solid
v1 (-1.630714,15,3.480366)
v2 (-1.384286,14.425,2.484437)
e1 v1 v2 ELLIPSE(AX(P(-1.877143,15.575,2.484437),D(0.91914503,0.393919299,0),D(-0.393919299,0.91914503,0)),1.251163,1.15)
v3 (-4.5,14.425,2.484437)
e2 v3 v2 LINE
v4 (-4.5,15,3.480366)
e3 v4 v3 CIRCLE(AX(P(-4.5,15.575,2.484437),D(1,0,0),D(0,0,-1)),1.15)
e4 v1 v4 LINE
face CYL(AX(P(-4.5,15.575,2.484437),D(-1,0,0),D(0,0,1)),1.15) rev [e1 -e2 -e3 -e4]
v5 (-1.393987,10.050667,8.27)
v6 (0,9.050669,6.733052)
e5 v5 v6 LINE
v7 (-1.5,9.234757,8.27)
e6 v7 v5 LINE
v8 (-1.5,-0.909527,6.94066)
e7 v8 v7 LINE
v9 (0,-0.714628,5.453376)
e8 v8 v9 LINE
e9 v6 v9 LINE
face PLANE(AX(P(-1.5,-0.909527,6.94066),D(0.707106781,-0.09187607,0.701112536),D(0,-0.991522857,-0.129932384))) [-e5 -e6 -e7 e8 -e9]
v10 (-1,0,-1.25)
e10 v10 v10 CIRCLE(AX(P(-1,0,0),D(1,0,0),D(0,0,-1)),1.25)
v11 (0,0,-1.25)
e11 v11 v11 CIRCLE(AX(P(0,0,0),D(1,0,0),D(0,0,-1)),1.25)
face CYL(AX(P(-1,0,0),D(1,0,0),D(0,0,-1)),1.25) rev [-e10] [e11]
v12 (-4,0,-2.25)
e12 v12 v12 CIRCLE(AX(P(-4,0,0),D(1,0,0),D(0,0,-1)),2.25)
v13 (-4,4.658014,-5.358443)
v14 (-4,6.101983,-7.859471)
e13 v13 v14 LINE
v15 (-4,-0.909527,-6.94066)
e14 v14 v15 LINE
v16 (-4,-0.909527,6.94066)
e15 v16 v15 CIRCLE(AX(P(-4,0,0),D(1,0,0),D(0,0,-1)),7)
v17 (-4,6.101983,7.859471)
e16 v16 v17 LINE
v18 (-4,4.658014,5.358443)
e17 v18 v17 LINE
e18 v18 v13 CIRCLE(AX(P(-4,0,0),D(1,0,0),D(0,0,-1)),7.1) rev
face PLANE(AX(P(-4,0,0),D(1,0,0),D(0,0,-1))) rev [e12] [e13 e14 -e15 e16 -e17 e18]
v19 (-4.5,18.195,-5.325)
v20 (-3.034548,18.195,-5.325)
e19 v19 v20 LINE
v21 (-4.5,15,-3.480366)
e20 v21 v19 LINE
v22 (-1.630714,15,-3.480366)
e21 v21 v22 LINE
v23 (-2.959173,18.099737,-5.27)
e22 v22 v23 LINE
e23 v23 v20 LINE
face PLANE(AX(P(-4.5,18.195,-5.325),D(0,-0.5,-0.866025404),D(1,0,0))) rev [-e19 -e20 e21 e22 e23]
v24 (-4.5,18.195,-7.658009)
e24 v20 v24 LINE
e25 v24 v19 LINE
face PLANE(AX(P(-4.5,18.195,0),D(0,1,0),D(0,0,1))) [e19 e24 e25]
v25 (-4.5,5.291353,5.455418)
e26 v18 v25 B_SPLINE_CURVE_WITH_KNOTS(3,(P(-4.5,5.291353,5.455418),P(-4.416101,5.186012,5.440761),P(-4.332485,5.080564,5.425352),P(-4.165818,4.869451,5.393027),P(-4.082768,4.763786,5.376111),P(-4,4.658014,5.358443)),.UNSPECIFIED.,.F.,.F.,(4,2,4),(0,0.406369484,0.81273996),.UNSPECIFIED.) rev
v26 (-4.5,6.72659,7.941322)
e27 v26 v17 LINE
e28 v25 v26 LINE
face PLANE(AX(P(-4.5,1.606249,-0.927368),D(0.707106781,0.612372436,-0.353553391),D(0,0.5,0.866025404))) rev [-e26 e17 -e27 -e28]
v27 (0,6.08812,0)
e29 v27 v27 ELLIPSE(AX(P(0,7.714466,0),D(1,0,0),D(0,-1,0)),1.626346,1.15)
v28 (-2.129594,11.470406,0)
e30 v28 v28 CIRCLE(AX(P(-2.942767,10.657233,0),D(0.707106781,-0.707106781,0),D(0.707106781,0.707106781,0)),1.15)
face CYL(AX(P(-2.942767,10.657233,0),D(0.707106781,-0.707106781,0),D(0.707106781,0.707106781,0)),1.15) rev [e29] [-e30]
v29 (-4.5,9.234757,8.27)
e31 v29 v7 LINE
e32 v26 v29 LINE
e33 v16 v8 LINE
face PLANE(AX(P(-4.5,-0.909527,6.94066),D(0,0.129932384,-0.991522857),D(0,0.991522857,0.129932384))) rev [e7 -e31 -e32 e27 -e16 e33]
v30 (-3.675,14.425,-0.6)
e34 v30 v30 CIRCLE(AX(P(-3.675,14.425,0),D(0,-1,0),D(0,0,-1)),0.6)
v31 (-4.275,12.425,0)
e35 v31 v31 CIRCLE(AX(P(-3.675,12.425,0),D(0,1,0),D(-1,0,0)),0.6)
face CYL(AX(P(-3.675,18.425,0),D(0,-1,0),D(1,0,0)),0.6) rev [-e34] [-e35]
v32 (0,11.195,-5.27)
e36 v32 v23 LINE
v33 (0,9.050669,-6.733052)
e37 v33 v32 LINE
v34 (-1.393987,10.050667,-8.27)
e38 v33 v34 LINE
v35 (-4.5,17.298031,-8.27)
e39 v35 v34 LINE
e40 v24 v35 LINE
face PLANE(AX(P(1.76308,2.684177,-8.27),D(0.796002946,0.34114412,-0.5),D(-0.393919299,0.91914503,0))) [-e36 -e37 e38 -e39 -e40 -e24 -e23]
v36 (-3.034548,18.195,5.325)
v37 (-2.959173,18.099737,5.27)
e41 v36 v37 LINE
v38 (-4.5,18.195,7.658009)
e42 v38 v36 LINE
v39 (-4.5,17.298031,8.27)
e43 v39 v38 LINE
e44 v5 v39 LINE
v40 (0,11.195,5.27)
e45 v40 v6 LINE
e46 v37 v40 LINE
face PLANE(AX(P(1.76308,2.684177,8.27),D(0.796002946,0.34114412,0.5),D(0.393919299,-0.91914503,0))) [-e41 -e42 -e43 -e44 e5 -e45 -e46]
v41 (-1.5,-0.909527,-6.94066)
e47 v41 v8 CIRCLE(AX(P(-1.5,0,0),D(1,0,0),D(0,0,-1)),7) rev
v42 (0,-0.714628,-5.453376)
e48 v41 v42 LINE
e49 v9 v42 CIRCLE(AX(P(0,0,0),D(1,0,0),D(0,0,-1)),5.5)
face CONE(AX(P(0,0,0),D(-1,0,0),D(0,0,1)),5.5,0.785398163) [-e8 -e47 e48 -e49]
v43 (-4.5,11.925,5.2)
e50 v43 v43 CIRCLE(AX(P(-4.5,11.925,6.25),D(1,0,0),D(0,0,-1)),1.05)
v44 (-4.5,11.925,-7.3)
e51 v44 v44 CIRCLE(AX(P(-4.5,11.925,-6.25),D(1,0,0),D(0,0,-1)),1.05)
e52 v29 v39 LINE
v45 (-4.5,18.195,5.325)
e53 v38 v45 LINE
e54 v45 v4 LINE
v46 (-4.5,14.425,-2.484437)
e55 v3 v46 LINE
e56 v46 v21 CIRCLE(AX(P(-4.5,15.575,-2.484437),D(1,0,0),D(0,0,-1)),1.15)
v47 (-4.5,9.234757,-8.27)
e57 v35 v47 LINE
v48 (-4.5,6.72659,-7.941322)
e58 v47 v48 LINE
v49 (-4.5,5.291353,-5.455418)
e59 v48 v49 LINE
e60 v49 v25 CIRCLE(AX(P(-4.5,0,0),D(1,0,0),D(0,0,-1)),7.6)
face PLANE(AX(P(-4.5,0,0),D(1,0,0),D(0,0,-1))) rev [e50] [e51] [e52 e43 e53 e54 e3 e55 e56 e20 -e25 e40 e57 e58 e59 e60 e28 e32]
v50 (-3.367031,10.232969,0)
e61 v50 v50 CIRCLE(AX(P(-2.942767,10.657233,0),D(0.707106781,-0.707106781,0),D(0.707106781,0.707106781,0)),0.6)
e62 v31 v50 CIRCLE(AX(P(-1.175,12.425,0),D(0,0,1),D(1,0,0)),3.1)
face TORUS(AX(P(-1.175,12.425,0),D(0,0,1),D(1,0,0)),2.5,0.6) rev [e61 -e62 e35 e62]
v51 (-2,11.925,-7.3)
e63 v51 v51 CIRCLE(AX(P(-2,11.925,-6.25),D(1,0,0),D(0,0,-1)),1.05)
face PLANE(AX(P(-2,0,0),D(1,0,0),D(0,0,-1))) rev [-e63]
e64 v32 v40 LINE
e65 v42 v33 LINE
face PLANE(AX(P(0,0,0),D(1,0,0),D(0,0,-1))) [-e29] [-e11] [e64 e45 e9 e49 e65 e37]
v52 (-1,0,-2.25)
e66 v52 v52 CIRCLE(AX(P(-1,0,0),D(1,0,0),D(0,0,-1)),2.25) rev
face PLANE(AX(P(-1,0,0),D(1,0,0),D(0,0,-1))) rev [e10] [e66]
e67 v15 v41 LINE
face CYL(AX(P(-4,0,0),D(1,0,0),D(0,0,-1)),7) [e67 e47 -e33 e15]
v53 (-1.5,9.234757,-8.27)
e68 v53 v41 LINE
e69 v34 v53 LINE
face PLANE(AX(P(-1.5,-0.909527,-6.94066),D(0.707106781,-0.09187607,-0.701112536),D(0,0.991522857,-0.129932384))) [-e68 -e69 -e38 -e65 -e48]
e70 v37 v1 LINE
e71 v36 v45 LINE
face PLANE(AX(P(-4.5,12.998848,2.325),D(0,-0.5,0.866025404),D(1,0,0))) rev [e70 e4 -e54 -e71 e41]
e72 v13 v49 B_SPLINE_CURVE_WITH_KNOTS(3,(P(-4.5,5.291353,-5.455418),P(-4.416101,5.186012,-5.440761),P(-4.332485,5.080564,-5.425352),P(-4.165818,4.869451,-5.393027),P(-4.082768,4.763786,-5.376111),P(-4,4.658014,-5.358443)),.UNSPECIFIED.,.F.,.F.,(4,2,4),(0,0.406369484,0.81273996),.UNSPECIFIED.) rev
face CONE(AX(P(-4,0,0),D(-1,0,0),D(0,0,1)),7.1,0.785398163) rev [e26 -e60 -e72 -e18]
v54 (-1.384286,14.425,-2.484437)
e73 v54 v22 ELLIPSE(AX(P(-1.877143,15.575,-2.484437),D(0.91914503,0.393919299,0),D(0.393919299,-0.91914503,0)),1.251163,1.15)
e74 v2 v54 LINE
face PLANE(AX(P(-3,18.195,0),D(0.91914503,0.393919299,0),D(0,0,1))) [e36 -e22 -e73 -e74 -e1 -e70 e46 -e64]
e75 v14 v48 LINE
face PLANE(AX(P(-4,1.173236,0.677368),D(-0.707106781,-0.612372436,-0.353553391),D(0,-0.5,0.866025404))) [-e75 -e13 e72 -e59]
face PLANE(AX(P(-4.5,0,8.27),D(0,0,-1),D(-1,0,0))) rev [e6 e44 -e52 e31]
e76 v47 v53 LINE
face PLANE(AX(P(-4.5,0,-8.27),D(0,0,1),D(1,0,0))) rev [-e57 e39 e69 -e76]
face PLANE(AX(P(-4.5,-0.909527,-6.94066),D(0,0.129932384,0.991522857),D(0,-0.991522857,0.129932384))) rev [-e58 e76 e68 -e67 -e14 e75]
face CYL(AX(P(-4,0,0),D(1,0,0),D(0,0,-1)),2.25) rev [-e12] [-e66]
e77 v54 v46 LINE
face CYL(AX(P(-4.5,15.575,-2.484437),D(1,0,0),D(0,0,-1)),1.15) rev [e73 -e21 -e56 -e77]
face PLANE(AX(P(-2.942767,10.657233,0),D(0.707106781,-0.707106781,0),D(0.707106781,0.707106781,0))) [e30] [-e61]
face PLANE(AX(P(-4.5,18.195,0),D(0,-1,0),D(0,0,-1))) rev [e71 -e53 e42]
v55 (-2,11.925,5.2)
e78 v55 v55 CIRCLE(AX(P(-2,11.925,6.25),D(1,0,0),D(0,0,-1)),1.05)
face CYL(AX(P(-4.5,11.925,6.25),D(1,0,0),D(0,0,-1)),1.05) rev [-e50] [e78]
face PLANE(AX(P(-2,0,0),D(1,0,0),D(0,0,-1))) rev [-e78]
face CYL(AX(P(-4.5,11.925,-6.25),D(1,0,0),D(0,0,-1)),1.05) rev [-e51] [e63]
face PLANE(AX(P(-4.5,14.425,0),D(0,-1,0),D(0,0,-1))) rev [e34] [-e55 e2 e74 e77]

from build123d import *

# Parameters (mm, degrees)
BOSS_EXTRUDE4_DEPTH  = 4.5
SKETCH1_R            = 2.25
BOSS_EXTRUDE1_DEPTH  = 4
SKETCH1_4_R          = 2.25
SKETCH1_4_R_2        = 1.25
BOSS_EXTRUDE2_DEPTH  = 1
CHAMFER1_SIZE        = 3
CHAMFER1_SIZE_2      = 5.196152423
FILLET1_R            = 1.15
CHAMFER2_SIZE        = 7
CHAMFER2_SIZE2       = 3
CHAMFER3_SIZE        = 3
CHAMFER3_SIZE2       = 1.732050808
CHAMFER4_SIZE        = 1.5
CUT_EXTRUDE1_START   = -2
SKETCH1_6_R          = 1.05
CUT_EXTRUDE1_DEPTH   = 19.48660355
CUT_SWEEP1_PROFILE_R = 0.6
CUT_SWEEP2_PROFILE_R = 1.15
CHAMFER5_SIZE        = 0.5


# Some blends are built 0.0001 mm under size
with BuildPart() as part:
    # Sketch1<7> → Boss-Extrude4 (new body)
    with BuildSketch(Plane(origin=(0, 0, 0), x_dir=(0, 0, -1), z_dir=(1, 0, 0))):
        with BuildLine():
            Line((8.27, 9.234757272), (8.27, 18.195))
            Line((8.27, 18.195), (2.325, 18.195))
            Line((2.325, 18.195), (2.325, 14.425))
            Line((2.325, 14.425), (-2.325, 14.425))
            Line((-2.325, 14.425), (-2.325, 18.195))
            Line((-2.325, 18.195), (-8.27, 18.195))
            Line((-8.27, 18.195), (-8.27, 9.234757272))
            Line((-8.27, 9.234757272), (-7.859471067, 6.101983066))
            Line((-7.859471067, 6.101983066), (-5.358442733, 4.658013684))
            ThreePointArc((-5.358442733, 4.658013684), (0, 7.1), (5.358442733, 4.658013684))
            Line((5.358442733, 4.658013684), (7.859471067, 6.101983066))
            Line((7.859471067, 6.101983066), (8.27, 9.234757272))
        make_face()
    extrude(amount=-BOSS_EXTRUDE4_DEPTH)

    # Sketch1 → Boss-Extrude1 (add)
    with BuildSketch(Plane(origin=(0, 0, 0), x_dir=(0, 0, -1), z_dir=(1, 0, 0))):
        with BuildLine():
            Line((6.940659998, -0.909526687), (7.859471067, 6.101983066))
            Line((7.859471067, 6.101983066), (5.358442733, 4.658013684))
            ThreePointArc((5.358442733, 4.658013684), (0, 7.1), (-5.358442733, 4.658013684))
            Line((-5.358442733, 4.658013684), (-7.859471067, 6.101983066))
            Line((-7.859471067, 6.101983066), (-6.940659998, -0.909526687))
            ThreePointArc((-6.940659998, -0.909526687), (0, -7), (6.940659998, -0.909526687))
        make_face()
        Circle(SKETCH1_R, mode=Mode.SUBTRACT)
    extrude(amount=-BOSS_EXTRUDE1_DEPTH)

    # Sketch1<4> → Boss-Extrude2 (add)
    with BuildSketch(Plane(origin=(0, 0, 0), x_dir=(0, 0, -1), z_dir=(1, 0, 0))):
        Circle(SKETCH1_4_R)
        Circle(SKETCH1_4_R_2, mode=Mode.SUBTRACT)
    extrude(amount=-BOSS_EXTRUDE2_DEPTH)

    # Chamfer1
    # the kernel refuses this chamfer: 5.196152423, 3 mm, written as the material it takes off along each edge
    with BuildSketch(Plane(origin=(13.442891912, 18.195, -2.325), x_dir=(0, 0.057893862402672046, -0.9983227437537926), z_dir=(-1, 0, 0))) as chamfer1_piece_1_section:
        Polygon((CHAMFER1_SIZE * 0.998322743754, CHAMFER1_SIZE * 0.0578938624027), (-CHAMFER1_SIZE_2 * 0.0578938623994, CHAMFER1_SIZE_2 * 0.998322743697), (0, 0), align=None)
    chamfer1_piece_1 = extrude(amount=31.385783824, mode=Mode.PRIVATE)
    chamfer1_piece_1 = split(chamfer1_piece_1, bisect_by=Plane(origin=(-2.25, 14.425, -3.37149022), z_dir=(0, 1, 0)), keep=Keep.TOP, mode=Mode.PRIVATE)
    add(chamfer1_piece_1, mode=Mode.SUBTRACT)
    with BuildSketch(Plane(origin=(13.442891912, 18.195, 2.325), x_dir=(0, -0.9998132206222079, -0.019326765612700594), z_dir=(-1, 0, 0))) as chamfer1_piece_2_section:
        Polygon((CHAMFER1_SIZE_2 * 0.999813220566, CHAMFER1_SIZE_2 * 0.0193267656116), (-CHAMFER1_SIZE * 0.0193267656127, CHAMFER1_SIZE * 0.999813220622), (0, 0), align=None)
    chamfer1_piece_2 = extrude(amount=31.385783824, mode=Mode.PRIVATE)
    chamfer1_piece_2 = split(chamfer1_piece_2, bisect_by=Plane(origin=(-2.25, 14.425, 3.37149022), z_dir=(0, 1, 0)), keep=Keep.TOP, mode=Mode.PRIVATE)
    add(chamfer1_piece_2, mode=Mode.SUBTRACT)

    # Fillet1
    fillet1_edges = [part.edges().sort_by_distance(p)[0] for p in [
        (-2.25, 14.425, -3.148389485),
        (-2.25, 14.425, 3.148389485),
    ]]
    fillet(fillet1_edges, radius=FILLET1_R)

    # Chamfer2
    chamfer2_edges = [part.edges().sort_by_distance(p)[0] for p in [
        (0, 18.195, 6.7975),
    ]]
    chamfer2_side = [part.faces().sort_by_distance(p)[0] for p in [
        (0, 5.909970068, 0),
    ]]
    chamfer(chamfer2_edges, length=CHAMFER2_SIZE, length2=CHAMFER2_SIZE2, reference=chamfer2_side[0])

    # Chamfer3
    chamfer3_edges = [part.edges().sort_by_distance(p)[0] for p in [
        (-1.5, 14.695, -8.27),
        (-1.5, 14.695, 8.27),
    ]]
    chamfer3_side = [part.faces().sort_by_distance(p)[0] for p in [
        (-1.210290333, 14.019010778, 0),
    ]]
    chamfer(chamfer3_edges, length=CHAMFER3_SIZE, length2=CHAMFER3_SIZE2, reference=chamfer3_side[0])

    # Chamfer4
    chamfer4_edges = [part.edges().sort_by_distance(p)[0] for p in [
        (0, 3.140553901, 7.471395746),
        (0, 3.140553901, -7.471395746),
        (0, -7, 0),
    ]]
    chamfer(chamfer4_edges, length=CHAMFER4_SIZE)

    # Sketch1<6> → Cut-Extrude1 (cut, through all)
    with BuildSketch(Plane(origin=(0, 0, 0), x_dir=(0, 0, -1), z_dir=(1, 0, 0)).offset(CUT_EXTRUDE1_START)):
        with Locations((6.25, 11.925)):
            Circle(SKETCH1_6_R)
        with Locations((-6.25, 11.925)):
            Circle(SKETCH1_6_R)
    extrude(amount=-CUT_EXTRUDE1_DEPTH, mode=Mode.SUBTRACT)

    # Cut-Sweep1: sweep along a path in Sketch2
    with BuildLine(Plane.XY) as cut_sweep1_path:
        Line((4.128300859, 3.586165235), (-2.942766953, 10.657233047))
        ThreePointArc((-2.942766953, 10.657233047), (-3.484698831, 11.468291419), (-3.675, 12.425))
        Line((-3.675, 12.425), (-3.675, 14.425))
    # Cut-Sweep1 profile (on start of the path) → Cut-Sweep1 (sweep, cut)
    with BuildSketch(Plane(origin=(4.128300859, 3.586165235, 0), x_dir=(-0.7071067811865461, -0.707106781186549, 0), z_dir=(-0.707106781186549, 0.7071067811865461, 0))):
        Circle(CUT_SWEEP1_PROFILE_R)
    sweep(path=cut_sweep1_path.line, mode=Mode.SUBTRACT)

    # Cut-Sweep2: sweep along a path in Sketch2<3>
    with BuildLine(Plane.XY) as cut_sweep2_path:
        Line((-2.942766953, 10.657233047), (4.128300859, 3.586165235))
    # Cut-Sweep2 profile (on start of the path) → Cut-Sweep2 (sweep, cut)
    with BuildSketch(Plane(origin=(-2.942766953, 10.657233047, 0), x_dir=(0.7071067811865461, 0.707106781186549, 0), z_dir=(0.707106781186549, -0.7071067811865461, 0))):
        Circle(CUT_SWEEP2_PROFILE_R)
    sweep(path=cut_sweep2_path.line, mode=Mode.SUBTRACT)

    # Chamfer5
    chamfer5_edges = [part.edges().sort_by_distance(p)[0] for p in [
        (-4.5, 5.379998375, -6.6089569),
        (-4.5, 7.1, 0),
        (-4.5, 5.379998375, 6.6089569),
    ]]
    chamfer(chamfer5_edges, length=CHAMFER5_SIZE - 0.0001)  # a hair under: the kernel refuses the full size


solid = part.part
